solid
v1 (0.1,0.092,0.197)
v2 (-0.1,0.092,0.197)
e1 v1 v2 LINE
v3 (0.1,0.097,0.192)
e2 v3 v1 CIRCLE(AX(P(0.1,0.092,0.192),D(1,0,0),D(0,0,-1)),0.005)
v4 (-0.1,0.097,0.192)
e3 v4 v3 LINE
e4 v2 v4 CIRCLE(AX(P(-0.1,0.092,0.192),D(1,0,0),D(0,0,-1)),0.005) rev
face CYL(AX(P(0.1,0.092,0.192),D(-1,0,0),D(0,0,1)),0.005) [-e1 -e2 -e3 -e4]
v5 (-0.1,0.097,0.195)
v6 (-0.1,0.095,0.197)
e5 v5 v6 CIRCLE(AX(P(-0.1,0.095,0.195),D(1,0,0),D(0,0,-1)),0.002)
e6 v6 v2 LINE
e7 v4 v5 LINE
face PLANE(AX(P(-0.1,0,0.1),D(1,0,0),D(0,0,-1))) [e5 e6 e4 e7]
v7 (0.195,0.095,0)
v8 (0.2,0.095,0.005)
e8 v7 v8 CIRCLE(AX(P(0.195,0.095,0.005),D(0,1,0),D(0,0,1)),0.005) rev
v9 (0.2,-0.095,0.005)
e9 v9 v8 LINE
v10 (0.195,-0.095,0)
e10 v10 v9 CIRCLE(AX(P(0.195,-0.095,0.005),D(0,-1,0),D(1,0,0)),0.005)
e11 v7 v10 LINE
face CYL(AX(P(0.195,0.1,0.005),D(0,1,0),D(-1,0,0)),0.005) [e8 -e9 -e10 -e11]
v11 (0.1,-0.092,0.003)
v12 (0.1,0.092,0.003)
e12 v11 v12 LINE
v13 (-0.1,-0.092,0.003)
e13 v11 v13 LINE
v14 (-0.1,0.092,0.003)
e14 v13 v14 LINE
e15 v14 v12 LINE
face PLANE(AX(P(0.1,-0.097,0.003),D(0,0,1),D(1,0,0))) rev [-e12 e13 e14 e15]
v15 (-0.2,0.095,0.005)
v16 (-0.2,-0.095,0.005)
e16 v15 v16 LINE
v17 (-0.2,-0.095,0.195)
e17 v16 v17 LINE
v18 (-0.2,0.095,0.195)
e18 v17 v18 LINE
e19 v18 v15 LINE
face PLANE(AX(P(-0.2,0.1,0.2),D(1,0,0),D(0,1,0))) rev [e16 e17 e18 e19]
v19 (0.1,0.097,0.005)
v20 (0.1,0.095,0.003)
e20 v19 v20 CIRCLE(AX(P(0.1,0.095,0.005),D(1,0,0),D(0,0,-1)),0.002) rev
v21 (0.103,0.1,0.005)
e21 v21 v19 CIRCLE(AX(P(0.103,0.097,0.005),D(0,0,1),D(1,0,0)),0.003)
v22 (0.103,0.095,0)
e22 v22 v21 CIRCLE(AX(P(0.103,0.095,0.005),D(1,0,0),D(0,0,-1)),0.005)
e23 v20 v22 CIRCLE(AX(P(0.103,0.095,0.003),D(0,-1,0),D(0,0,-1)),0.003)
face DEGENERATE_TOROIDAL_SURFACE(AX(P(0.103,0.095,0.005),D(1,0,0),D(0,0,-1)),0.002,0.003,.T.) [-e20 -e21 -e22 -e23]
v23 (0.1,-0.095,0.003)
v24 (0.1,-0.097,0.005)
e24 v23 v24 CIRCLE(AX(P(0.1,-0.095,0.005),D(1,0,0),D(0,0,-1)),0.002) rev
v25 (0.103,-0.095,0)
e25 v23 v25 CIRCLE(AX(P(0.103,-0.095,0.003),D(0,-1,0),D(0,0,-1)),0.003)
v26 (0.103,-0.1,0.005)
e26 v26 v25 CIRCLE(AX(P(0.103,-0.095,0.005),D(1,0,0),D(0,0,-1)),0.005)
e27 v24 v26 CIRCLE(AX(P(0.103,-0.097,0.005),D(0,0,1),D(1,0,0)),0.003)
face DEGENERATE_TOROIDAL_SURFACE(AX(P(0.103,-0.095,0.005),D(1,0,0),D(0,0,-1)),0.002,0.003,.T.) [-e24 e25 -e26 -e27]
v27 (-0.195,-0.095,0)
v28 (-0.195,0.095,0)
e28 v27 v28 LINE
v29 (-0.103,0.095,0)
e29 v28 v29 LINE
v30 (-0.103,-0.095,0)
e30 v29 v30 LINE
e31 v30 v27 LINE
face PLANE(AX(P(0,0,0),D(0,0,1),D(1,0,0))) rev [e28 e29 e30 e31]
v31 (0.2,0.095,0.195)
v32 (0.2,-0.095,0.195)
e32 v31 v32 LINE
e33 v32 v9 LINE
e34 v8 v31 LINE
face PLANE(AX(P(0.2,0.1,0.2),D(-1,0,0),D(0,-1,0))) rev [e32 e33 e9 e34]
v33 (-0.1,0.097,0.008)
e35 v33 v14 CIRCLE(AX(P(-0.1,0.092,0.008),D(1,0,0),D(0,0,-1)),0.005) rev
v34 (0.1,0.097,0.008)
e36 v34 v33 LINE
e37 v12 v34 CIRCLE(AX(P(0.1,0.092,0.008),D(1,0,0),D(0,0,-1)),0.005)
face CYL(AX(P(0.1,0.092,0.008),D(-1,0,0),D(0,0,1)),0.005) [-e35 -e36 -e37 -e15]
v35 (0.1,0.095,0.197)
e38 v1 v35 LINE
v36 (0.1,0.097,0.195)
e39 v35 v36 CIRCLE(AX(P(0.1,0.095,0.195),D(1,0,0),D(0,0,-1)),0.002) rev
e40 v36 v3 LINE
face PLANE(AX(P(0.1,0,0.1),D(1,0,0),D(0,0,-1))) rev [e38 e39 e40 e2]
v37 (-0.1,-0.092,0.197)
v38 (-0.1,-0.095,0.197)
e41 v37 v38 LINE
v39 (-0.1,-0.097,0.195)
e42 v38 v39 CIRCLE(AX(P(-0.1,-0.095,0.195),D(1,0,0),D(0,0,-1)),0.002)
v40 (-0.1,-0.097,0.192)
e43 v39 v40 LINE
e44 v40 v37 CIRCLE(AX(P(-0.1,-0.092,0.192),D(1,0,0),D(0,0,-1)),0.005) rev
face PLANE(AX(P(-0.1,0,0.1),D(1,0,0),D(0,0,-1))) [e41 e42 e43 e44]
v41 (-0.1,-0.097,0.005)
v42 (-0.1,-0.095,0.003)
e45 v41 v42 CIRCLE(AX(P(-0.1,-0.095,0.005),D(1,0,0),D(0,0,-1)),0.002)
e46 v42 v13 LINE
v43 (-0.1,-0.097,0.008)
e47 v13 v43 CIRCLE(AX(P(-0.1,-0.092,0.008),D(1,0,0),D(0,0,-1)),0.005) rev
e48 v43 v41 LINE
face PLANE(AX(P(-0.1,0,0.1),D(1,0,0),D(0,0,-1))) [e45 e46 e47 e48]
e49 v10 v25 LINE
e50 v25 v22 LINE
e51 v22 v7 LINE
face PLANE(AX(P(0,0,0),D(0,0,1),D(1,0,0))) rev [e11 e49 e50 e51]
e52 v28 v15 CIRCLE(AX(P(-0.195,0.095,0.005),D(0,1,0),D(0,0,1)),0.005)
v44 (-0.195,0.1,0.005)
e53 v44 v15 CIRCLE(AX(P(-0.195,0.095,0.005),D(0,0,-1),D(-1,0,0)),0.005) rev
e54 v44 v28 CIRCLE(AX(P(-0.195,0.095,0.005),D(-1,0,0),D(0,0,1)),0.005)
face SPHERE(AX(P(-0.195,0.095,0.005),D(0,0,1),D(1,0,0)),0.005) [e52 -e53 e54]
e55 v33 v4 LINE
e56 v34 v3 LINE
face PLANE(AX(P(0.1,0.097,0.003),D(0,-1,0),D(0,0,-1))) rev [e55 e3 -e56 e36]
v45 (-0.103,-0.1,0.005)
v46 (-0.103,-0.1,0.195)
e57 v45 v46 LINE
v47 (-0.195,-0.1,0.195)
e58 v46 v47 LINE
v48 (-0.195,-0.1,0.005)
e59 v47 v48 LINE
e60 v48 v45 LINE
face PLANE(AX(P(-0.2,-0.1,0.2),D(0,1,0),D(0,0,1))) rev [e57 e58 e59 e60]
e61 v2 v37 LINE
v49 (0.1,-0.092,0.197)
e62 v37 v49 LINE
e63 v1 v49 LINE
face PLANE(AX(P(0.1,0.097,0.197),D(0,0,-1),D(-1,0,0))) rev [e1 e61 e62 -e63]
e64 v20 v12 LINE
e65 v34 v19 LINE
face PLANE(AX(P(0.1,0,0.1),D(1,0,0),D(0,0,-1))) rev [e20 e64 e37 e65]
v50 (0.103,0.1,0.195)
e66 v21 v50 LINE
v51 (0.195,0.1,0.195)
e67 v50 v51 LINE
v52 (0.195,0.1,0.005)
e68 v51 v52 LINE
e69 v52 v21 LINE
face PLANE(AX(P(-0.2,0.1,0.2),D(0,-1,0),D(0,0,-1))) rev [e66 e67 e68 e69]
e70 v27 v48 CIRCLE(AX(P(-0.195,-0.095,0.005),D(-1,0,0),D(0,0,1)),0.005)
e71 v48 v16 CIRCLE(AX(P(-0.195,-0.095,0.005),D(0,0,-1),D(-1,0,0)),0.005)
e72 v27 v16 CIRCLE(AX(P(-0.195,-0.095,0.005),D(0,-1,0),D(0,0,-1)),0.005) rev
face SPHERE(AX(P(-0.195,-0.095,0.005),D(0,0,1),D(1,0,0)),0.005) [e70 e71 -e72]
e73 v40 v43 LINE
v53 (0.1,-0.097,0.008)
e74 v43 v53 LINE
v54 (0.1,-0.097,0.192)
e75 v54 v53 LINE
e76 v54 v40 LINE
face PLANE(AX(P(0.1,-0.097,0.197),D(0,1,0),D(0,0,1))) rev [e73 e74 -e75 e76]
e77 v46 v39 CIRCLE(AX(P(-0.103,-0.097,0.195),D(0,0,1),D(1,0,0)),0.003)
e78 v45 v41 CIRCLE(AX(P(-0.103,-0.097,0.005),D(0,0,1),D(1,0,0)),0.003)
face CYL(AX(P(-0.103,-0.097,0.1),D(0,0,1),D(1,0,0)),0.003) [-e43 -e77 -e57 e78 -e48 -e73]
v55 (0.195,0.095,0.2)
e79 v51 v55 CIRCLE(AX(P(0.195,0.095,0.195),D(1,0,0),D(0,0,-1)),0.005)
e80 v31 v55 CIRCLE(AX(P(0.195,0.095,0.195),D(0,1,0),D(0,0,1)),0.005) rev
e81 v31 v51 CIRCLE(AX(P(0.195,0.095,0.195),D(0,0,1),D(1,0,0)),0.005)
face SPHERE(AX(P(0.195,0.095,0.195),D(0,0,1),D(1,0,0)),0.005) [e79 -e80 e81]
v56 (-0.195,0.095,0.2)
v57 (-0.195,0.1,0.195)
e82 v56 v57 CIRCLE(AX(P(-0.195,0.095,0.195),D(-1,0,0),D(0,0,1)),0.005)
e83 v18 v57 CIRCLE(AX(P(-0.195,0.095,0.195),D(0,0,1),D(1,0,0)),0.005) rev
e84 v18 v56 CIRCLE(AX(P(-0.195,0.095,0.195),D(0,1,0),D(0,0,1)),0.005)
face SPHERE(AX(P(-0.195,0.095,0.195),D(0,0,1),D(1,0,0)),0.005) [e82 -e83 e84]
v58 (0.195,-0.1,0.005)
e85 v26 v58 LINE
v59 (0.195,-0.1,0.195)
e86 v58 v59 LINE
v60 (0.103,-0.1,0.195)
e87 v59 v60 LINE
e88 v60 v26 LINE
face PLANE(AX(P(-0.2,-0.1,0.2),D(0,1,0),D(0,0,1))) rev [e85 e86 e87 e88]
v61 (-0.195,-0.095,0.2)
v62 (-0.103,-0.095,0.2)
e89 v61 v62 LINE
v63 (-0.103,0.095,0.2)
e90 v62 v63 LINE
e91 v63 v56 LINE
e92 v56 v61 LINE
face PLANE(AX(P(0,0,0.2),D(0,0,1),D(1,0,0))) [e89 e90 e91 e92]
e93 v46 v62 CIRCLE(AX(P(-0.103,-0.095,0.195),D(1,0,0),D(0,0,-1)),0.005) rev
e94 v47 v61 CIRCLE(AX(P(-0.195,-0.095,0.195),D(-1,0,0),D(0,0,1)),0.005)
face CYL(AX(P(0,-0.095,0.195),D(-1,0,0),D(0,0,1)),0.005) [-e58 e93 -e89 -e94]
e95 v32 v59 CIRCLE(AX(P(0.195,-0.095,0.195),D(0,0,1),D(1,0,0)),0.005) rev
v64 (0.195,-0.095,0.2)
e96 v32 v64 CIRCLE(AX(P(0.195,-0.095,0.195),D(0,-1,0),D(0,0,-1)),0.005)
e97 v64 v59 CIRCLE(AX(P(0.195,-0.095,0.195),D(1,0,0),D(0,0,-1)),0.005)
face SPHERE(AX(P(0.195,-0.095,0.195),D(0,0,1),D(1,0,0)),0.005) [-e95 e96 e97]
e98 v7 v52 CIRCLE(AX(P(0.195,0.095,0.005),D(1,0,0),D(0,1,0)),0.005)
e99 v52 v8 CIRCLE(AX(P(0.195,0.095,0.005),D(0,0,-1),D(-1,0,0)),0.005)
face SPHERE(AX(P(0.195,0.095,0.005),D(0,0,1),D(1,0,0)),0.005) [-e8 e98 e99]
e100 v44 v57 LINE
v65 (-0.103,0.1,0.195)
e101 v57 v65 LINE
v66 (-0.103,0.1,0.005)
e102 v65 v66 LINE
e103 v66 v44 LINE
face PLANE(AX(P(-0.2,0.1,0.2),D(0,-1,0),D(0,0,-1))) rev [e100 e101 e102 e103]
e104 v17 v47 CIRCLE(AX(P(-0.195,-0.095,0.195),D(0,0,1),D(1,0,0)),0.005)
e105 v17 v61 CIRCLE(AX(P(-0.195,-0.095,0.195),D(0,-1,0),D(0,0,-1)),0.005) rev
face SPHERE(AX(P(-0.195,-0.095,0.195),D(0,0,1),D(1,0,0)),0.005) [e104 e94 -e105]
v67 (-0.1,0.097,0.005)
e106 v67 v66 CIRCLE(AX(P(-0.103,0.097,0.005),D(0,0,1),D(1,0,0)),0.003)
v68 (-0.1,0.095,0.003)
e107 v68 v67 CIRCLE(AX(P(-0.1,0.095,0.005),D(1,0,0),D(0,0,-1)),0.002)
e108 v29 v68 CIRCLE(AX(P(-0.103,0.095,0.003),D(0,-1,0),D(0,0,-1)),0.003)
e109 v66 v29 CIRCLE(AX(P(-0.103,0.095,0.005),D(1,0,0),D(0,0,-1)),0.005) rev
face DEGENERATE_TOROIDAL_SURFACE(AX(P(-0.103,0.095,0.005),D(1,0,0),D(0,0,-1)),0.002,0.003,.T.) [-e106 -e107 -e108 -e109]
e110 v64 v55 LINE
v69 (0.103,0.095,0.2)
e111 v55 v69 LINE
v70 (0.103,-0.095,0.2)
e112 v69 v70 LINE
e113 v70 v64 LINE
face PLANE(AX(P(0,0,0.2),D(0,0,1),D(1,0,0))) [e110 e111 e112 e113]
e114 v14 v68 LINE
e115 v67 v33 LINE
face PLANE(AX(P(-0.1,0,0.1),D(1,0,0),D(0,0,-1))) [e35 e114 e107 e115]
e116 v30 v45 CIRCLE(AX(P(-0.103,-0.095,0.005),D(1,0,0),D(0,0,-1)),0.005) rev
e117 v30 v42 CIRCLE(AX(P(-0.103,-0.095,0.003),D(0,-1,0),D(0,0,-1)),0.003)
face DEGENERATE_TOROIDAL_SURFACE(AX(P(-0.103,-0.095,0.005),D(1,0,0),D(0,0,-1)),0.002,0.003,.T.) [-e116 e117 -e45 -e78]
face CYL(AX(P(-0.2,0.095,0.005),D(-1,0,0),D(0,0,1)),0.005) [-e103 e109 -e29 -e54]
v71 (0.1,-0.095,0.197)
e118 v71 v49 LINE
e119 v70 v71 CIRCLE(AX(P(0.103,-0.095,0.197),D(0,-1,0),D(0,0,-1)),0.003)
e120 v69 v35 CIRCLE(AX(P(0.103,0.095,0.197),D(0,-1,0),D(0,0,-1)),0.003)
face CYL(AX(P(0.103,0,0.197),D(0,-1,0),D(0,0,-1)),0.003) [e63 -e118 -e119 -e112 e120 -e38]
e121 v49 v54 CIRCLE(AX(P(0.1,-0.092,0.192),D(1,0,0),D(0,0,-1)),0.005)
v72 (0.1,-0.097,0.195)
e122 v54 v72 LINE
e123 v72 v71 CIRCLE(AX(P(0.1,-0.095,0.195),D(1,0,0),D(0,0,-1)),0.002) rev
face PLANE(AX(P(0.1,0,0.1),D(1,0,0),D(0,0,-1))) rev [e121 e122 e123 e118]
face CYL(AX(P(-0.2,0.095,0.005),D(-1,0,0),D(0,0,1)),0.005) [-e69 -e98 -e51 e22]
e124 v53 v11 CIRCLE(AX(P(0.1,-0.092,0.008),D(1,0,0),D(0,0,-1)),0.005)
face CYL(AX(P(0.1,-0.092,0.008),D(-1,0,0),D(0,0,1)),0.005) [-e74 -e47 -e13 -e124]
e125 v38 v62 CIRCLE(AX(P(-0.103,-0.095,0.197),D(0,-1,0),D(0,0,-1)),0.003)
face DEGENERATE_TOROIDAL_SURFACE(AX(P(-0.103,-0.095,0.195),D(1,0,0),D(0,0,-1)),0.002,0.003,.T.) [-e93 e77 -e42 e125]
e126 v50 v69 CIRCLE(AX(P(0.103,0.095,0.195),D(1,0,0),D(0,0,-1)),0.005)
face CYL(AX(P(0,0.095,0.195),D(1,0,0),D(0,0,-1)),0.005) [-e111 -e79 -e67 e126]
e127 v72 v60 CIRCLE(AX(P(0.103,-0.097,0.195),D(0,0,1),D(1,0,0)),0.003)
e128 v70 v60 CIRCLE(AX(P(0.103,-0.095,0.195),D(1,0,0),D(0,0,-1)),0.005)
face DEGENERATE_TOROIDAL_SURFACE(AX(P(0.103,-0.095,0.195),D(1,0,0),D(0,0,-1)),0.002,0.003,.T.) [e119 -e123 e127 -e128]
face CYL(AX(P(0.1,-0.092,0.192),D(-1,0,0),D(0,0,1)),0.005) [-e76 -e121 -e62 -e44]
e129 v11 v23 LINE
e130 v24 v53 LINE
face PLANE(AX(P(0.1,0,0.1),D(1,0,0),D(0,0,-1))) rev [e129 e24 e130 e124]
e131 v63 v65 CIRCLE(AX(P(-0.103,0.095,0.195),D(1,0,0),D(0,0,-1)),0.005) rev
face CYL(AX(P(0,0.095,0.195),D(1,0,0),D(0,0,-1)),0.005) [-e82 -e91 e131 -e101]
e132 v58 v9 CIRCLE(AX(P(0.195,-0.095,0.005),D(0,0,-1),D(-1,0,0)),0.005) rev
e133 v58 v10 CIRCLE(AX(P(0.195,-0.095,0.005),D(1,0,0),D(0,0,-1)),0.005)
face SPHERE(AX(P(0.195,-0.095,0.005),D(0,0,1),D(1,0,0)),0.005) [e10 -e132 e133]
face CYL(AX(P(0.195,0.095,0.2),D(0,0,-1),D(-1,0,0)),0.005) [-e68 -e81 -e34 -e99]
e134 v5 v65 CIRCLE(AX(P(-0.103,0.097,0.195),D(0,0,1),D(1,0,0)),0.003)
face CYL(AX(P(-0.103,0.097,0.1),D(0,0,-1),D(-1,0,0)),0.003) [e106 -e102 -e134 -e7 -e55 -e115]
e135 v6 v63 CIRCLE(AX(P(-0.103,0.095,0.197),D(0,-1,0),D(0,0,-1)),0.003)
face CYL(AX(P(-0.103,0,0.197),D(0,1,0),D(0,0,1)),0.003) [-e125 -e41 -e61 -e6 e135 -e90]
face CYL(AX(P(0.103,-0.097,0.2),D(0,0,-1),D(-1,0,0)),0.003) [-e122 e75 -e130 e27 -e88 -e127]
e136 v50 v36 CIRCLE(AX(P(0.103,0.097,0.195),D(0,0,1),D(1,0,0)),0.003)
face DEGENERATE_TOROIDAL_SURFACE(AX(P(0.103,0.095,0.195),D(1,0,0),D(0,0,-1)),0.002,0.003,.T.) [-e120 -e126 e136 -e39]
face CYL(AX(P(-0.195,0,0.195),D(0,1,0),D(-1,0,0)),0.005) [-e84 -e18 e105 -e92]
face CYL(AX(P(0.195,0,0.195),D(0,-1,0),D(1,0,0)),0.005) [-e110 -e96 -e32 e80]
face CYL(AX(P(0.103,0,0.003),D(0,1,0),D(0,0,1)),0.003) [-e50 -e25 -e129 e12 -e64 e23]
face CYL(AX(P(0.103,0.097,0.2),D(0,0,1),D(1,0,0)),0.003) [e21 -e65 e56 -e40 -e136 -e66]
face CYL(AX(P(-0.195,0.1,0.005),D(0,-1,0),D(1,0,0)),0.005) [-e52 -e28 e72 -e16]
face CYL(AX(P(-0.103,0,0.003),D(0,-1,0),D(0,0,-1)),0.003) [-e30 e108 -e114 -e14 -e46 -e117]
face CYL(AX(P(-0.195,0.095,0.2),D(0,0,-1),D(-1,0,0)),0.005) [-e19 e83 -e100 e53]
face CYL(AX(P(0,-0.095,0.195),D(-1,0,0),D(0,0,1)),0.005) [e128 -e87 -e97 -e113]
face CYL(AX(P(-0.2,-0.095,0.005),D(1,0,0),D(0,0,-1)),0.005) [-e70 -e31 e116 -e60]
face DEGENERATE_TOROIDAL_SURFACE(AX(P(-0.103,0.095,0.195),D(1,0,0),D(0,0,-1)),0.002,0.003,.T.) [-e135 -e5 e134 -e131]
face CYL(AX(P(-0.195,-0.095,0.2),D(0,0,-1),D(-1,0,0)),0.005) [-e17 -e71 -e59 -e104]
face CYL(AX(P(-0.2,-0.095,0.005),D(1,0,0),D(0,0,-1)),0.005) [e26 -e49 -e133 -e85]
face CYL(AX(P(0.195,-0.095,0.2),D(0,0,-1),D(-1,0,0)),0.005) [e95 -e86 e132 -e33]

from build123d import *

# Parameters (mm, degrees)
SKETCH1_W                           = 0.4
SKETCH1_H                           = 0.2
ALL_BODY_DEPTH                      = 0.2
CUT_OUT_THE_BODY_FOR_PIN_DEPTH      = 0.1
CUT_OUT_THE_BODY_FOR_PIN_DEPTH_BACK = 0.1
SKETCH2_OUTSIDE_W                   = 2.298
SKETCH2_OUTSIDE_H                   = 2.298
SKETCH2_OUTSIDE_W_2                 = 0.194
SKETCH2_OUTSIDE_H_2                 = 0.194
BODY_FILLET_R                       = 0.005
PIN_FILLET_A_R                      = 0.005
PIN_FILLET_B_R                      = 0.003


with BuildPart() as part:
    # Sketch1 → All body (new body)
    with BuildSketch(Plane.XY):
        Rectangle(SKETCH1_W, SKETCH1_H)
    extrude(amount=ALL_BODY_DEPTH)

    # Sketch2 outside → Cut out the body for pin (cut, two sides: drawn at the far end of the back side and taken through both)
    with BuildSketch(Plane(origin=(0, 0, 0), x_dir=(0, 0, -1), z_dir=(1, 0, 0)).offset(-CUT_OUT_THE_BODY_FOR_PIN_DEPTH_BACK)):
        with Locations((-0.1, 0)):
            Rectangle(SKETCH2_OUTSIDE_W, SKETCH2_OUTSIDE_H)
        with Locations((-0.1, 0)):
            Rectangle(SKETCH2_OUTSIDE_W_2, SKETCH2_OUTSIDE_H_2, mode=Mode.SUBTRACT)
    extrude(amount=CUT_OUT_THE_BODY_FOR_PIN_DEPTH + CUT_OUT_THE_BODY_FOR_PIN_DEPTH_BACK, mode=Mode.SUBTRACT)

    # Body fillet
    body_fillet_edges = [part.edges().sort_by_distance(p)[0] for p in [
        (0, 0.097, 0.003),
        (0, 0.097, 0.197),
        (0, -0.097, 0.197),
        (0, -0.097, 0.003),
    ]]
    fillet(body_fillet_edges, radius=BODY_FILLET_R)

    # Pin fillet a
    pin_fillet_a_edges = [part.edges().sort_by_distance(p)[0] for p in [
        (0.2, 0, 0.2),
        (-0.15, 0.1, 0),
        (0.15, -0.1, 0),
        (0.15, -0.1, 0.2),
        (-0.15, 0.1, 0.2),
        (0.15, 0.1, 0.2),
        (-0.2, 0, 0.2),
        (0.15, 0.1, 0),
        (0.2, 0, 0),
        (-0.15, -0.1, 0),
        (-0.2, 0, 0),
        (-0.2, 0.1, 0.1),
        (0.2, 0.1, 0.1),
        (0.2, -0.1, 0.1),
        (-0.2, -0.1, 0.1),
        (-0.15, -0.1, 0.2),
    ]]
    fillet(pin_fillet_a_edges, radius=PIN_FILLET_A_R)

    # Pin fillet b
    pin_fillet_b_edges = [part.edges().sort_by_distance(p)[0] for p in [
        (0.1, -0.1, 0.1),
        (0.1, 0, 0.2),
        (0.1, 0.1, 0.1),
        (0.1, 0, 0),
        (-0.1, 0.1, 0.1),
        (-0.1, 0, 0.2),
        (-0.1, -0.1, 0.1),
        (-0.1, 0, 0),
        (0.1, 0.098535534, 0.001464466),
        (0.1, -0.098535534, 0.001464466),
        (0.1, -0.098535534, 0.198535534),
        (0.1, 0.098535534, 0.198535534),
        (-0.1, -0.098535534, 0.198535534),
        (-0.1, 0.098535534, 0.198535534),
        (-0.1, -0.098535534, 0.001464466),
        (-0.1, 0.098535534, 0.001464466),
    ]]
    fillet(pin_fillet_b_edges, radius=PIN_FILLET_B_R - 0.0001)  # a hair under: the kernel refuses the full size


solid = part.part
